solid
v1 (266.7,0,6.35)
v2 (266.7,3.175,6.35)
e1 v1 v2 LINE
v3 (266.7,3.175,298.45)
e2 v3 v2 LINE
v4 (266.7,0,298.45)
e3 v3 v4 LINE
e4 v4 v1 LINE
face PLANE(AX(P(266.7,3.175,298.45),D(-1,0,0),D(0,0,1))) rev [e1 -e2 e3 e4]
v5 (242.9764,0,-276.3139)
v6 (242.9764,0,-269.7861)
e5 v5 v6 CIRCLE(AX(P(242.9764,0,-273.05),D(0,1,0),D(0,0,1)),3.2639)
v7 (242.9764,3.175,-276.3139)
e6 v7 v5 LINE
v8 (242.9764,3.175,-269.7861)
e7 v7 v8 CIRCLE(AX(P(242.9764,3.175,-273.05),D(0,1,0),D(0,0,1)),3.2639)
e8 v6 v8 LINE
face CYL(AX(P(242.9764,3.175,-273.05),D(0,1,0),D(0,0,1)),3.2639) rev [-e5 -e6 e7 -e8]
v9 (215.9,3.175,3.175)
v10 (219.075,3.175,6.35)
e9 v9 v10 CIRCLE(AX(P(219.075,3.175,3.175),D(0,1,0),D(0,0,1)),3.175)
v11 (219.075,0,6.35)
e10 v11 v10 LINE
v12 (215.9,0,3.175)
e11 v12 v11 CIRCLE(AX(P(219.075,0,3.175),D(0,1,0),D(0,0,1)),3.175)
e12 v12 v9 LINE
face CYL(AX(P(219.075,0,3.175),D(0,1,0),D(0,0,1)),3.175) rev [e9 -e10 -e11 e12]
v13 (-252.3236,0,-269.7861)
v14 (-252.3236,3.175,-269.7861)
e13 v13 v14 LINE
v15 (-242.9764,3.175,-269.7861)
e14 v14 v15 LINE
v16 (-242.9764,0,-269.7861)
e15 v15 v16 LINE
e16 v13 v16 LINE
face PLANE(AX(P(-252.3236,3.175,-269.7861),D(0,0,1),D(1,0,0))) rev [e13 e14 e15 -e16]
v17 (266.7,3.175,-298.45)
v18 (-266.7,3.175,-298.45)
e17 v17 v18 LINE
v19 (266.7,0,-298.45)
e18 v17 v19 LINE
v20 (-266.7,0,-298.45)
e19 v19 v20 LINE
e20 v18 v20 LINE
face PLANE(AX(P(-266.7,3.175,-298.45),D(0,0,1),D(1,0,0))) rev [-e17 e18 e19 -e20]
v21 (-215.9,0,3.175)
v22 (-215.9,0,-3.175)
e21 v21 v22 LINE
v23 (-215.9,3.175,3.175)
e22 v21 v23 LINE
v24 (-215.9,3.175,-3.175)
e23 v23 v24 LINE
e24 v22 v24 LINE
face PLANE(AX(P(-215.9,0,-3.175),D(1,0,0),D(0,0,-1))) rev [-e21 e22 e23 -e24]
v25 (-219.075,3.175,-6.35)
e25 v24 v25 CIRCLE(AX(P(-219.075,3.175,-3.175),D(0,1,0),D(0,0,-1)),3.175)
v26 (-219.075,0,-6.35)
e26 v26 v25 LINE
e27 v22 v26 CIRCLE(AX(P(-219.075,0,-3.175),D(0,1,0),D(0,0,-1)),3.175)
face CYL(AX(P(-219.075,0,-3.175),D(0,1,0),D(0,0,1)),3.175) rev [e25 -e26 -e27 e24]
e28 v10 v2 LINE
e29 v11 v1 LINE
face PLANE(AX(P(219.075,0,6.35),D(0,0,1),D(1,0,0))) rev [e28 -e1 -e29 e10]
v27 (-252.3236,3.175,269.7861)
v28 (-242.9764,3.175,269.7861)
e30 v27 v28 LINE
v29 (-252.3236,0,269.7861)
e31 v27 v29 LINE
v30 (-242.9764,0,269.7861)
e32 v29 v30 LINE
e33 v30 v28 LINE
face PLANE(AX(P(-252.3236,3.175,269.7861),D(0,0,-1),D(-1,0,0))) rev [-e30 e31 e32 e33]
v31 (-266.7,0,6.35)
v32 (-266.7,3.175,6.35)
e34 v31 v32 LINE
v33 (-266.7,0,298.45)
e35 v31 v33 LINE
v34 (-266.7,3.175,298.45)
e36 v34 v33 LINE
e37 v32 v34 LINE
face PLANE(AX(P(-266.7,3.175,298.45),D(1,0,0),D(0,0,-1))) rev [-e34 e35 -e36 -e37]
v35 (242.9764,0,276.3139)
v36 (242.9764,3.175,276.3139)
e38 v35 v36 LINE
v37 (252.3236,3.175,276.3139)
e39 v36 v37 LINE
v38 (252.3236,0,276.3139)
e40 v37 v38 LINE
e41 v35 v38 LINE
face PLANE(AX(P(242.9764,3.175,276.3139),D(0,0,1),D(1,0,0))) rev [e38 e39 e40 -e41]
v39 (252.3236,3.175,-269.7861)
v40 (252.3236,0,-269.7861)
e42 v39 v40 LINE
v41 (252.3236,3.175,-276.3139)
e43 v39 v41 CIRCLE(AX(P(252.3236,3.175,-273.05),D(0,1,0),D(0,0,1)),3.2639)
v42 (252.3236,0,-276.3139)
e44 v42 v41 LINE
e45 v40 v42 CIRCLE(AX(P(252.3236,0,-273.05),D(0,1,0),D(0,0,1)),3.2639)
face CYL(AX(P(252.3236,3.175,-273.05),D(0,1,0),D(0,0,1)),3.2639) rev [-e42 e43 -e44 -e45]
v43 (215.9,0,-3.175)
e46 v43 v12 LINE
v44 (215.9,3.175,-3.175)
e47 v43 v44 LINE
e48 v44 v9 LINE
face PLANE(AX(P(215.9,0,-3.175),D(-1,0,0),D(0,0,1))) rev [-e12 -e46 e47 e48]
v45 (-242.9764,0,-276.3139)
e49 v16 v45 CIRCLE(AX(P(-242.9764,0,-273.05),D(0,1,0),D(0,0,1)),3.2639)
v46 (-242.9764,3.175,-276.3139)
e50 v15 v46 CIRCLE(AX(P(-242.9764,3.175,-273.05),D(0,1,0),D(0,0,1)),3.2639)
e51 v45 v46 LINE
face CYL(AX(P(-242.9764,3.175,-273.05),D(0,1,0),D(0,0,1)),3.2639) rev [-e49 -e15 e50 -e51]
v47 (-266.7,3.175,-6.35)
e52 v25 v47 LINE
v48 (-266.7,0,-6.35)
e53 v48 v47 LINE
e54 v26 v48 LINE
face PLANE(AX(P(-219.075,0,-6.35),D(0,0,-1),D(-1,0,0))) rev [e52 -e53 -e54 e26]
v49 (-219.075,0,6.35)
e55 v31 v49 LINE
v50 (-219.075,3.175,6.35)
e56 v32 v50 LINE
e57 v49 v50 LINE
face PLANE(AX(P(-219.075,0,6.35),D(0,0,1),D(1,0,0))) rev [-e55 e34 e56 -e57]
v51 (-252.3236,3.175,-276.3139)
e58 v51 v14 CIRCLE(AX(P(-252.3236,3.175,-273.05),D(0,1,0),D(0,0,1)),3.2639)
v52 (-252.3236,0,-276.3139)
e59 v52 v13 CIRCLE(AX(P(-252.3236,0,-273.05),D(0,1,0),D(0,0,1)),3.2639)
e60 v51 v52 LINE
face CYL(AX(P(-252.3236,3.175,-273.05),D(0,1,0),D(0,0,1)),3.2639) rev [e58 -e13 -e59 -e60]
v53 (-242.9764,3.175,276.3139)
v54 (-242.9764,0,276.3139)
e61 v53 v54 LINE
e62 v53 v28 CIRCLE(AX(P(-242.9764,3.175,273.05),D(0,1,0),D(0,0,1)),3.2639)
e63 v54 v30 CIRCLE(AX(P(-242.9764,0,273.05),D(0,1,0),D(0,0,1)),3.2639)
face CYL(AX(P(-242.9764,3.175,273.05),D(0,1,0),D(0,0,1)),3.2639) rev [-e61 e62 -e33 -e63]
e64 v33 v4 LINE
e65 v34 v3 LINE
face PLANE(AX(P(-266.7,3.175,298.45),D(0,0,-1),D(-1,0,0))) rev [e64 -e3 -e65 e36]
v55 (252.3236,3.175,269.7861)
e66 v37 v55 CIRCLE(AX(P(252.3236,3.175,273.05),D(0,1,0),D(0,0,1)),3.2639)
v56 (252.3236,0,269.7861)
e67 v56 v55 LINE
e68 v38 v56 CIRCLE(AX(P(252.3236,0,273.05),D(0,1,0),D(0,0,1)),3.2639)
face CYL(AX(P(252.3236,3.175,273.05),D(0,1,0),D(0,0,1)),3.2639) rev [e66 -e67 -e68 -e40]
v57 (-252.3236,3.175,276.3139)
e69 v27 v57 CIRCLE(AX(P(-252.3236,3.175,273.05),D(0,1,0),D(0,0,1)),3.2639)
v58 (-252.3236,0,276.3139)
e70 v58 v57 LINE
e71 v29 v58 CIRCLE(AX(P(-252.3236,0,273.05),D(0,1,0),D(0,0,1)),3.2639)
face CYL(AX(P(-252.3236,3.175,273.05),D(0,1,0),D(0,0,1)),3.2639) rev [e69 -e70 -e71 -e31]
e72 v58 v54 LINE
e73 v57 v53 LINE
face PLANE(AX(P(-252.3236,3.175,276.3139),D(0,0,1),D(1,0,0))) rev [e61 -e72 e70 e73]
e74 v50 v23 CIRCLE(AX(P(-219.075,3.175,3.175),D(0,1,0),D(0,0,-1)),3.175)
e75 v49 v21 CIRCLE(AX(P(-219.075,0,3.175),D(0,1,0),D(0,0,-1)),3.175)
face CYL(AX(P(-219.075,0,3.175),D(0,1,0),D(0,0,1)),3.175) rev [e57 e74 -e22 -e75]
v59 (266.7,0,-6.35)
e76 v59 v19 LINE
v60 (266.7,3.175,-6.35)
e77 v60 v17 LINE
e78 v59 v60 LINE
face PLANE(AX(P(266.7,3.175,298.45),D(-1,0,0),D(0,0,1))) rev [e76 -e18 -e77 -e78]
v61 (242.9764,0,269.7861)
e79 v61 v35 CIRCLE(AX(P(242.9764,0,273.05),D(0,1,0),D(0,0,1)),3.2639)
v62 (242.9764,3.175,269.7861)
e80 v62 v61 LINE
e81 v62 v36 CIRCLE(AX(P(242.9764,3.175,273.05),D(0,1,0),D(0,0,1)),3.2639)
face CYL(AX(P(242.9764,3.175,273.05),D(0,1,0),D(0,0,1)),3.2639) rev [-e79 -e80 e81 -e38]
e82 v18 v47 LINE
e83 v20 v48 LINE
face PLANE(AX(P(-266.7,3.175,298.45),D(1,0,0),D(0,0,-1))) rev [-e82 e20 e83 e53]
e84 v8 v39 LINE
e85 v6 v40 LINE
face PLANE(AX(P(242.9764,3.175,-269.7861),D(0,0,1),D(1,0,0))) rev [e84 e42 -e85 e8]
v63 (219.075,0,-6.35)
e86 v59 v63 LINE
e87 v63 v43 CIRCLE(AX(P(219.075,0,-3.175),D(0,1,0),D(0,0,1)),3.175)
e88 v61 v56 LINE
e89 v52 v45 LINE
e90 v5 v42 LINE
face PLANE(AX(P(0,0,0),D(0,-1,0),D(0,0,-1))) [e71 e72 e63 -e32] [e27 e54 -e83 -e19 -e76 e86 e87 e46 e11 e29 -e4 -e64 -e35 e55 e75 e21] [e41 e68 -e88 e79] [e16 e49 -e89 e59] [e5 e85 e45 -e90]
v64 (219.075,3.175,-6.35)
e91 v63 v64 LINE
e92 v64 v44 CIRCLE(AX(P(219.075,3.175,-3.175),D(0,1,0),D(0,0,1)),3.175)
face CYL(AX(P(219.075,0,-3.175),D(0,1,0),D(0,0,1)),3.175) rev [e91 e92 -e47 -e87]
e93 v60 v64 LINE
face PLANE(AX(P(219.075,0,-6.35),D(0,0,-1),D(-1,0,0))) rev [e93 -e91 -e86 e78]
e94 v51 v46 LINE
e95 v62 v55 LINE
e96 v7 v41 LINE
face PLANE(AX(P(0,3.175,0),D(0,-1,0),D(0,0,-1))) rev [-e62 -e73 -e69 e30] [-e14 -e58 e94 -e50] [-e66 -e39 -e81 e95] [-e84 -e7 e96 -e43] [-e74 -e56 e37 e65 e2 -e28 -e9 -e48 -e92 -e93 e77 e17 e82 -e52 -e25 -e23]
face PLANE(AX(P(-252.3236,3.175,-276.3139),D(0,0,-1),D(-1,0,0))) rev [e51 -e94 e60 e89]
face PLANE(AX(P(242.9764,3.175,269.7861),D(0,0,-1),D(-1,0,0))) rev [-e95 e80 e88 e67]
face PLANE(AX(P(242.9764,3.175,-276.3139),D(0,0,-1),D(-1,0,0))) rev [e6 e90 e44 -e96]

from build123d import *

# Parameters (mm, degrees)
SKETCH1_W                    = 533.4
SKETCH1_H                    = 596.9
BOSS_EXTRUDE1_DEPTH          = 3.175
F_0_257_DIAMETER_SLOT1_DEPTH = 3.175
CUT_EXTRUDE1_DEPTH           = 401.264129201


# Read off the part's stored shape, not the designer's step: F (0.257) Diameter Slot1
with BuildPart() as part:
    # Sketch1 → Boss-Extrude1 (new body)
    with BuildSketch(Plane(origin=(0, 0, 0), x_dir=(1, 0, 0), z_dir=(0, 1, 0))):
        Rectangle(SKETCH1_W, SKETCH1_H)
    extrude(amount=BOSS_EXTRUDE1_DEPTH)

    # F (0.257) Diameter Slot1 outline → F (0.257) Diameter Slot1 (cut)
    with BuildSketch(Plane(origin=(0, 0, 0), x_dir=(1, 0, 0), z_dir=(0, 1, 0))):
        with BuildLine():
            Line((242.9764, -276.3139), (252.3236, -276.3139))
            ThreePointArc((252.3236, -276.3139), (255.5875, -273.05), (252.3236, -269.7861))
            Line((252.3236, -269.7861), (242.9764, -269.7861))
            ThreePointArc((242.9764, -269.7861), (239.7125, -273.05), (242.9764, -276.3139))
        make_face()
        with BuildLine():
            ThreePointArc((-242.9764, -276.3139), (-239.7125, -273.05), (-242.9764, -269.7861))
            Line((-242.9764, -269.7861), (-252.3236, -269.7861))
            ThreePointArc((-252.3236, -269.7861), (-255.5875, -273.05), (-252.3236, -276.3139))
            Line((-252.3236, -276.3139), (-242.9764, -276.3139))
        make_face()
        with BuildLine():
            Line((242.9764, 269.7861), (252.3236, 269.7861))
            ThreePointArc((252.3236, 269.7861), (255.5875, 273.05), (252.3236, 276.3139))
            Line((252.3236, 276.3139), (242.9764, 276.3139))
            ThreePointArc((242.9764, 276.3139), (239.7125, 273.05), (242.9764, 269.7861))
        make_face()
        with BuildLine():
            ThreePointArc((-242.9764, 269.7861), (-239.7125, 273.05), (-242.9764, 276.3139))
            Line((-242.9764, 276.3139), (-252.3236, 276.3139))
            ThreePointArc((-252.3236, 276.3139), (-255.5875, 273.05), (-252.3236, 269.7861))
            Line((-252.3236, 269.7861), (-242.9764, 269.7861))
        make_face()
    extrude(amount=F_0_257_DIAMETER_SLOT1_DEPTH, mode=Mode.SUBTRACT)

    # Sketch5 → Cut-Extrude1 (cut, through all)
    with BuildSketch(Plane(origin=(0, 3.175, 0), x_dir=(1, 0, 0), z_dir=(0, 1, 0))):
        with BuildLine():
            Line((219.075, 6.35), (266.7, 6.35))
            Line((266.7, 6.35), (266.7, -6.35))
            Line((266.7, -6.35), (219.075, -6.35))
            ThreePointArc((219.075, -6.35), (216.82993597, -5.42006403), (215.9, -3.175))
            Line((215.9, -3.175), (215.9, 3.175))
            ThreePointArc((215.9, 3.175), (216.82993597, 5.42006403), (219.075, 6.35))
        make_face()
        with BuildLine():
            Line((-266.7, 6.35), (-266.7, -6.35))
            Line((-266.7, -6.35), (-219.075, -6.35))
            ThreePointArc((-219.075, -6.35), (-216.82993597, -5.42006403), (-215.9, -3.175))
            Line((-215.9, -3.175), (-215.9, 3.175))
            ThreePointArc((-215.9, 3.175), (-216.82993597, 5.42006403), (-219.075, 6.35))
            Line((-219.075, 6.35), (-266.7, 6.35))
        make_face()
    extrude(amount=-CUT_EXTRUDE1_DEPTH, mode=Mode.SUBTRACT)


solid = part.part
